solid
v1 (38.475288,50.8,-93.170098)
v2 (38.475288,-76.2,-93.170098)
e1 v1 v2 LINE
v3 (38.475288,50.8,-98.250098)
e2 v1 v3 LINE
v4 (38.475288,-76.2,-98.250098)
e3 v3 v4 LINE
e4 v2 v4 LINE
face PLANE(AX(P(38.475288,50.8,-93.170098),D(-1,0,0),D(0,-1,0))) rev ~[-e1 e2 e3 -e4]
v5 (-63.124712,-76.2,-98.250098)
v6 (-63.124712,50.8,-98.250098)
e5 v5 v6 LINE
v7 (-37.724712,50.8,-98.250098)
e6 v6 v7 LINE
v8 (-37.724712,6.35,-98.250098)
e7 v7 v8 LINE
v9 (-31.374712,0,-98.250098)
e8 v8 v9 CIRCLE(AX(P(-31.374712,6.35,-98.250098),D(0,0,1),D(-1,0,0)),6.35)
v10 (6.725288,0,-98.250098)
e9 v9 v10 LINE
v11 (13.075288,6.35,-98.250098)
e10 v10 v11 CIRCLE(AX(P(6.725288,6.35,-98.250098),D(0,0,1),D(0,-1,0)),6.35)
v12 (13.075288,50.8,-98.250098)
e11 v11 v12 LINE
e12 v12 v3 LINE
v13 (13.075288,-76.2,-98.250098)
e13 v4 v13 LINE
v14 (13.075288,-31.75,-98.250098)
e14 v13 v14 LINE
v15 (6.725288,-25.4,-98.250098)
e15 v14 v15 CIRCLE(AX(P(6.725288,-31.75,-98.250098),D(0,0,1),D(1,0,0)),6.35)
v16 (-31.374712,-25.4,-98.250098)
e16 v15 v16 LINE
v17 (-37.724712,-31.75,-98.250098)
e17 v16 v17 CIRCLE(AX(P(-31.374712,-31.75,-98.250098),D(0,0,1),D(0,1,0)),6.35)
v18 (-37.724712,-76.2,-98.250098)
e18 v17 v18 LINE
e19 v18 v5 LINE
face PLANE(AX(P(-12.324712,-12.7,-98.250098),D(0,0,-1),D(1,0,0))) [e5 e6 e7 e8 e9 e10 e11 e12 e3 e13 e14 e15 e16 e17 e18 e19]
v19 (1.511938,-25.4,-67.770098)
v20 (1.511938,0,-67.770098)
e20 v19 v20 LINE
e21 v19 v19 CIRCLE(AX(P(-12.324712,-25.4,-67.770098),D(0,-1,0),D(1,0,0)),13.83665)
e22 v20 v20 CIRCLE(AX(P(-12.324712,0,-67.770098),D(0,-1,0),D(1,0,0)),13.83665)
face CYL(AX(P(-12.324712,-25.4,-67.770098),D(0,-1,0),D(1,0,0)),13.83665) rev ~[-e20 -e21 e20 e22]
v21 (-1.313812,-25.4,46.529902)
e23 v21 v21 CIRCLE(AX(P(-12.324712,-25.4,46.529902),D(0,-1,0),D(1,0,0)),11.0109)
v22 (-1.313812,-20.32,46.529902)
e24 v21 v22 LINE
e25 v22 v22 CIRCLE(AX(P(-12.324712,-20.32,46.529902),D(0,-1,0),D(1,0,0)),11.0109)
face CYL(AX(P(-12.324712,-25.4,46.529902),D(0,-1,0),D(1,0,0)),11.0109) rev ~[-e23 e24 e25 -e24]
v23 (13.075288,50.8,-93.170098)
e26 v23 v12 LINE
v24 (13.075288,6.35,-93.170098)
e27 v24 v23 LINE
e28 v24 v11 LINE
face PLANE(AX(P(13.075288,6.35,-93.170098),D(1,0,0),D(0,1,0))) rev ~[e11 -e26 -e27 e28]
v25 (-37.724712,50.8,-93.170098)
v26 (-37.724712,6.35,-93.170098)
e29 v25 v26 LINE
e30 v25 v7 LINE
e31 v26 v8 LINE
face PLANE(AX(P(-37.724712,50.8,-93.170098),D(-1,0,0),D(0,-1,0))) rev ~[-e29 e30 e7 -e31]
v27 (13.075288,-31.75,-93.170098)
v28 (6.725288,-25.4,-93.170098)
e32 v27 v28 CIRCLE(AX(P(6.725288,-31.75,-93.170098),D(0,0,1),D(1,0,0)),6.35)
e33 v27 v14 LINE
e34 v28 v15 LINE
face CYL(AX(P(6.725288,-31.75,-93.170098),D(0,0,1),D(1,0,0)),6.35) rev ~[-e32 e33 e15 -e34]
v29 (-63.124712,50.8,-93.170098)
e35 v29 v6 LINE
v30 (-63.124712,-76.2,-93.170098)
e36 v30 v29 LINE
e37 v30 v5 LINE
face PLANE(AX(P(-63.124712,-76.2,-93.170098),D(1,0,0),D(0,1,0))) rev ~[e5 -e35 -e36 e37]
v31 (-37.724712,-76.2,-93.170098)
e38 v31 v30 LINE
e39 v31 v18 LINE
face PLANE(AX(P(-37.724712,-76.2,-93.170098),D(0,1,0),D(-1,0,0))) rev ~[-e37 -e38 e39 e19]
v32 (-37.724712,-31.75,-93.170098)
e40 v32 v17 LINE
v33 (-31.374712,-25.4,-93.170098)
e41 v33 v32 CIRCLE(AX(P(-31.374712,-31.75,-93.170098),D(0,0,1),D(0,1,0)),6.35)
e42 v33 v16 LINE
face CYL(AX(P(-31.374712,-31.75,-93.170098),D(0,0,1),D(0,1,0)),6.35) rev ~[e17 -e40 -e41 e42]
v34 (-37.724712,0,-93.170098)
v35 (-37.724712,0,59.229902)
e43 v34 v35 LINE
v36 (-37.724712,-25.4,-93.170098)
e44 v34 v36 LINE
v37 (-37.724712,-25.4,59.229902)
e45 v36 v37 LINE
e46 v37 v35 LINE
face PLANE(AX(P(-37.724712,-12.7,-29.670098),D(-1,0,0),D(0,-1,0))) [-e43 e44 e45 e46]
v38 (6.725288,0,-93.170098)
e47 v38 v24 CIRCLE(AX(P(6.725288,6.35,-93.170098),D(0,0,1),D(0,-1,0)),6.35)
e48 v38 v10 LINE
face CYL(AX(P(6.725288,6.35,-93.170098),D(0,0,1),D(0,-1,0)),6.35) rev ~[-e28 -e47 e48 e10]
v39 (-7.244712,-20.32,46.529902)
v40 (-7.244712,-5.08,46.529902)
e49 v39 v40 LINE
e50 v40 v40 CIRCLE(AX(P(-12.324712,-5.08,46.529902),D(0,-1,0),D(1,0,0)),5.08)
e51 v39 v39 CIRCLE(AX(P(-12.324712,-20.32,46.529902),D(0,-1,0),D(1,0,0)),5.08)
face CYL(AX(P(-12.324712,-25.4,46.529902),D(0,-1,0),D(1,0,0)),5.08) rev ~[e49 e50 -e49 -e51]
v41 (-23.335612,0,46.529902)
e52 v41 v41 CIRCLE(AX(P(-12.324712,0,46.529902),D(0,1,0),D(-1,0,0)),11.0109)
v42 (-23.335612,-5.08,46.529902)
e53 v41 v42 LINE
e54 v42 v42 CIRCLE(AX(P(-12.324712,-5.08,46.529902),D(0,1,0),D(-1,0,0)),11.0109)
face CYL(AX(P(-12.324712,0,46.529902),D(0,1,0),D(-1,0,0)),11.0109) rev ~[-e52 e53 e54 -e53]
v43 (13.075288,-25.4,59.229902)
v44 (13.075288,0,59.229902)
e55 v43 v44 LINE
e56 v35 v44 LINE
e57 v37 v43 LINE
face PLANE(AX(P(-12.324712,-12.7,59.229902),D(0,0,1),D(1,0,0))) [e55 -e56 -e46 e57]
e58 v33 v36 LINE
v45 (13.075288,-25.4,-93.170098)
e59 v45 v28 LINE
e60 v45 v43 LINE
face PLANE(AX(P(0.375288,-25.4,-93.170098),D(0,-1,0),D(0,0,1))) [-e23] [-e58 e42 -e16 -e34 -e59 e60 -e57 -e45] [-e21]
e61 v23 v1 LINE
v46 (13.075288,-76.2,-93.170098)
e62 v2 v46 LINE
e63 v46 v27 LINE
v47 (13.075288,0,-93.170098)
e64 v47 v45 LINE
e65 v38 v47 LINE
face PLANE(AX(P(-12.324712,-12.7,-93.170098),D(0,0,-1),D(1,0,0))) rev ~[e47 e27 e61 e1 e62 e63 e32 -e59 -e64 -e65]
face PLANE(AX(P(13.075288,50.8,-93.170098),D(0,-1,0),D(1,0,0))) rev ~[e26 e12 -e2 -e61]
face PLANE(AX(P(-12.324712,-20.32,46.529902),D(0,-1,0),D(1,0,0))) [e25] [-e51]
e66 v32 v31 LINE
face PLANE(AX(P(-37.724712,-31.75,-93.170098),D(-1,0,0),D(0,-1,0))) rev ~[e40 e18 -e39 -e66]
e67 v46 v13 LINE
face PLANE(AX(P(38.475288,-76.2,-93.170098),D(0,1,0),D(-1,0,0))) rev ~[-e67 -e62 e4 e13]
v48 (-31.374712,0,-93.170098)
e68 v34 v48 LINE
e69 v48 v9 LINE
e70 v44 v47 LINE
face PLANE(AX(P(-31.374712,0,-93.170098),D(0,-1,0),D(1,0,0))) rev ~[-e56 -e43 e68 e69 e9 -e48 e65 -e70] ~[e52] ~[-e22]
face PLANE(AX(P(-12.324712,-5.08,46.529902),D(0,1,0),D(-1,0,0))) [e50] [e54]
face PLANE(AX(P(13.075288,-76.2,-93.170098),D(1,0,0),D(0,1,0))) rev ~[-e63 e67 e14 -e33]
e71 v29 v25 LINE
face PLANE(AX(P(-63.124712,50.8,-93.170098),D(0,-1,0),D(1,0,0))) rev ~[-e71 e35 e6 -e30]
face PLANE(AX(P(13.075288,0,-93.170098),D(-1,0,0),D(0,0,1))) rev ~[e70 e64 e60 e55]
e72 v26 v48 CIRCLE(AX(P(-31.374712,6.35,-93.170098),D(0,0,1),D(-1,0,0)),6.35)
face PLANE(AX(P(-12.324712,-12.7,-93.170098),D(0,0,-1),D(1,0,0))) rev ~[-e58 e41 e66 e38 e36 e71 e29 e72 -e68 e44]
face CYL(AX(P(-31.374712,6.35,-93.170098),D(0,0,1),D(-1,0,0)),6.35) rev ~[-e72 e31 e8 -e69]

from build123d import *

# Parameters (mm, degrees)
F0_W      = 25.4
F0_H      = 127
F1_DEPTH  = 25.4
F2_W      = 50.8
F2_H      = 25.4
F3_DEPTH  = 25.4
F4_R      = 5.08
F5_DEPTH  = 25.4
F6_R      = 11.0109
F7_DEPTH  = 5.08
F8_R      = 11.0109
F9_DEPTH  = 5.08
F10_DEPTH = 25.4
F11_W     = 25.4
F11_H     = 127
F12_DEPTH = 12.7
F13_DEPTH = 12.7
F14_R     = 13.83665
F15_DEPTH = 25.4
F17_DEPTH = 5.08


with BuildPart() as f1:
    # F0 (on Front) → F1 (new body)
    with BuildSketch(Plane.XZ):
        with Locations((-12.3247115396, -29.6700978652)):
            Rectangle(F0_W, F0_H)
    extrude(amount=F1_DEPTH)

    # F2 (on face) → F3 (join)
    with BuildSketch(Plane.XY.offset(33.8299021348)):
        with Locations((-12.3247115396, -12.7)):
            Rectangle(F2_W, F2_H)
    extrude(amount=F3_DEPTH)

    # F4 (on face) → F5 (cut)
    with BuildSketch(Plane.XZ.offset(25.4)):
        with Locations((-12.3247115396, 46.5299021348)):
            Circle(F4_R)
    extrude(amount=-F5_DEPTH, mode=Mode.SUBTRACT)

    # F6 (on face) → F7 (cut)
    with BuildSketch(Plane.XZ.offset(25.4)):
        with Locations((-12.3247115396, 46.5299021348)):
            Circle(F6_R)
    extrude(amount=-F7_DEPTH, mode=Mode.SUBTRACT)

    # F8 (on face) → F9 (cut)
    with BuildSketch(Plane(origin=(0, 0, 0), x_dir=(-1, 0, 0), z_dir=(0, 1, 0))):
        with Locations((12.3247115396, 46.5299021348)):
            Circle(F8_R)
    extrude(amount=-F9_DEPTH, mode=Mode.SUBTRACT)

    # F4 (on face) → F10 (cut)
    with BuildSketch(Plane.XZ.offset(25.4)):
        with Locations((-12.3247115396, 46.5299021348)):
            Circle(F4_R)
    extrude(amount=-F10_DEPTH, mode=Mode.SUBTRACT)

    # F11 (on face) → F12 (join)
    with BuildSketch(Plane(origin=(-25.0247115396, 0, 0), x_dir=(0, -1, 0), z_dir=(-1, 0, 0))):
        with Locations((12.7, -29.6700978652)):
            Rectangle(F11_W, F11_H)
    extrude(amount=F12_DEPTH)

    # F13 (add): a face of the model
    f13_faces = [f1.faces().sort_by_distance(p)[0] for p in [
        (0.3752884604, -12.7, -29.6700978652),
    ]]
    extrude(f13_faces, amount=F13_DEPTH)

    # F14 (on face) → F15 (cut)
    with BuildSketch(Plane.XZ.offset(25.4)):
        with Locations((-12.3247115396, -67.7700978652)):
            Circle(F14_R)
    extrude(amount=-F15_DEPTH, mode=Mode.SUBTRACT)

    # F16 (on face) → F17 (join)
    with BuildSketch(Plane(origin=(0, 0, -93.1700978652), x_dir=(1, 0, 0), z_dir=(0, 0, -1))):
        with BuildLine():
            ThreePointArc((-37.7247115396, -6.35), (-35.8648396001, -1.8598719395), (-31.3747115396, 0))
            Line((-31.3747115396, 0), (6.7252884604, 0))
            ThreePointArc((6.7252884604, 0), (11.2154165209, -1.8598719395), (13.0752884604, -6.35))
            Line((13.0752884604, -6.35), (13.0752884604, -50.8))
            Line((13.0752884604, -50.8), (38.4752884604, -50.8))
            Line((38.4752884604, -50.8), (38.4752884604, 0))
            Line((38.4752884604, 0), (38.4752884604, 25.4))
            Line((38.4752884604, 25.4), (38.4752884604, 76.2))
            Line((38.4752884604, 76.2), (13.0752884604, 76.2))
            Line((13.0752884604, 76.2), (13.0752884604, 31.75))
            ThreePointArc((13.0752884604, 31.75), (11.2154165209, 27.2598719395), (6.7252884604, 25.4))
            Line((6.7252884604, 25.4), (-31.3747115396, 25.4))
            ThreePointArc((-31.3747115396, 25.4), (-35.8648396001, 27.2598719395), (-37.7247115396, 31.75))
            Line((-37.7247115396, 31.75), (-37.7247115396, 76.2))
            Line((-37.7247115396, 76.2), (-63.1247115396, 76.2))
            Line((-63.1247115396, 76.2), (-63.1247115396, 25.4))
            Line((-63.1247115396, 25.4), (-63.1247115396, 0))
            Line((-63.1247115396, 0), (-63.1247115396, -50.8))
            Line((-63.1247115396, -50.8), (-37.7247115396, -50.8))
            Line((-37.7247115396, -50.8), (-37.7247115396, -6.35))
        make_face()
    extrude(amount=F17_DEPTH)


solid = f1.part
